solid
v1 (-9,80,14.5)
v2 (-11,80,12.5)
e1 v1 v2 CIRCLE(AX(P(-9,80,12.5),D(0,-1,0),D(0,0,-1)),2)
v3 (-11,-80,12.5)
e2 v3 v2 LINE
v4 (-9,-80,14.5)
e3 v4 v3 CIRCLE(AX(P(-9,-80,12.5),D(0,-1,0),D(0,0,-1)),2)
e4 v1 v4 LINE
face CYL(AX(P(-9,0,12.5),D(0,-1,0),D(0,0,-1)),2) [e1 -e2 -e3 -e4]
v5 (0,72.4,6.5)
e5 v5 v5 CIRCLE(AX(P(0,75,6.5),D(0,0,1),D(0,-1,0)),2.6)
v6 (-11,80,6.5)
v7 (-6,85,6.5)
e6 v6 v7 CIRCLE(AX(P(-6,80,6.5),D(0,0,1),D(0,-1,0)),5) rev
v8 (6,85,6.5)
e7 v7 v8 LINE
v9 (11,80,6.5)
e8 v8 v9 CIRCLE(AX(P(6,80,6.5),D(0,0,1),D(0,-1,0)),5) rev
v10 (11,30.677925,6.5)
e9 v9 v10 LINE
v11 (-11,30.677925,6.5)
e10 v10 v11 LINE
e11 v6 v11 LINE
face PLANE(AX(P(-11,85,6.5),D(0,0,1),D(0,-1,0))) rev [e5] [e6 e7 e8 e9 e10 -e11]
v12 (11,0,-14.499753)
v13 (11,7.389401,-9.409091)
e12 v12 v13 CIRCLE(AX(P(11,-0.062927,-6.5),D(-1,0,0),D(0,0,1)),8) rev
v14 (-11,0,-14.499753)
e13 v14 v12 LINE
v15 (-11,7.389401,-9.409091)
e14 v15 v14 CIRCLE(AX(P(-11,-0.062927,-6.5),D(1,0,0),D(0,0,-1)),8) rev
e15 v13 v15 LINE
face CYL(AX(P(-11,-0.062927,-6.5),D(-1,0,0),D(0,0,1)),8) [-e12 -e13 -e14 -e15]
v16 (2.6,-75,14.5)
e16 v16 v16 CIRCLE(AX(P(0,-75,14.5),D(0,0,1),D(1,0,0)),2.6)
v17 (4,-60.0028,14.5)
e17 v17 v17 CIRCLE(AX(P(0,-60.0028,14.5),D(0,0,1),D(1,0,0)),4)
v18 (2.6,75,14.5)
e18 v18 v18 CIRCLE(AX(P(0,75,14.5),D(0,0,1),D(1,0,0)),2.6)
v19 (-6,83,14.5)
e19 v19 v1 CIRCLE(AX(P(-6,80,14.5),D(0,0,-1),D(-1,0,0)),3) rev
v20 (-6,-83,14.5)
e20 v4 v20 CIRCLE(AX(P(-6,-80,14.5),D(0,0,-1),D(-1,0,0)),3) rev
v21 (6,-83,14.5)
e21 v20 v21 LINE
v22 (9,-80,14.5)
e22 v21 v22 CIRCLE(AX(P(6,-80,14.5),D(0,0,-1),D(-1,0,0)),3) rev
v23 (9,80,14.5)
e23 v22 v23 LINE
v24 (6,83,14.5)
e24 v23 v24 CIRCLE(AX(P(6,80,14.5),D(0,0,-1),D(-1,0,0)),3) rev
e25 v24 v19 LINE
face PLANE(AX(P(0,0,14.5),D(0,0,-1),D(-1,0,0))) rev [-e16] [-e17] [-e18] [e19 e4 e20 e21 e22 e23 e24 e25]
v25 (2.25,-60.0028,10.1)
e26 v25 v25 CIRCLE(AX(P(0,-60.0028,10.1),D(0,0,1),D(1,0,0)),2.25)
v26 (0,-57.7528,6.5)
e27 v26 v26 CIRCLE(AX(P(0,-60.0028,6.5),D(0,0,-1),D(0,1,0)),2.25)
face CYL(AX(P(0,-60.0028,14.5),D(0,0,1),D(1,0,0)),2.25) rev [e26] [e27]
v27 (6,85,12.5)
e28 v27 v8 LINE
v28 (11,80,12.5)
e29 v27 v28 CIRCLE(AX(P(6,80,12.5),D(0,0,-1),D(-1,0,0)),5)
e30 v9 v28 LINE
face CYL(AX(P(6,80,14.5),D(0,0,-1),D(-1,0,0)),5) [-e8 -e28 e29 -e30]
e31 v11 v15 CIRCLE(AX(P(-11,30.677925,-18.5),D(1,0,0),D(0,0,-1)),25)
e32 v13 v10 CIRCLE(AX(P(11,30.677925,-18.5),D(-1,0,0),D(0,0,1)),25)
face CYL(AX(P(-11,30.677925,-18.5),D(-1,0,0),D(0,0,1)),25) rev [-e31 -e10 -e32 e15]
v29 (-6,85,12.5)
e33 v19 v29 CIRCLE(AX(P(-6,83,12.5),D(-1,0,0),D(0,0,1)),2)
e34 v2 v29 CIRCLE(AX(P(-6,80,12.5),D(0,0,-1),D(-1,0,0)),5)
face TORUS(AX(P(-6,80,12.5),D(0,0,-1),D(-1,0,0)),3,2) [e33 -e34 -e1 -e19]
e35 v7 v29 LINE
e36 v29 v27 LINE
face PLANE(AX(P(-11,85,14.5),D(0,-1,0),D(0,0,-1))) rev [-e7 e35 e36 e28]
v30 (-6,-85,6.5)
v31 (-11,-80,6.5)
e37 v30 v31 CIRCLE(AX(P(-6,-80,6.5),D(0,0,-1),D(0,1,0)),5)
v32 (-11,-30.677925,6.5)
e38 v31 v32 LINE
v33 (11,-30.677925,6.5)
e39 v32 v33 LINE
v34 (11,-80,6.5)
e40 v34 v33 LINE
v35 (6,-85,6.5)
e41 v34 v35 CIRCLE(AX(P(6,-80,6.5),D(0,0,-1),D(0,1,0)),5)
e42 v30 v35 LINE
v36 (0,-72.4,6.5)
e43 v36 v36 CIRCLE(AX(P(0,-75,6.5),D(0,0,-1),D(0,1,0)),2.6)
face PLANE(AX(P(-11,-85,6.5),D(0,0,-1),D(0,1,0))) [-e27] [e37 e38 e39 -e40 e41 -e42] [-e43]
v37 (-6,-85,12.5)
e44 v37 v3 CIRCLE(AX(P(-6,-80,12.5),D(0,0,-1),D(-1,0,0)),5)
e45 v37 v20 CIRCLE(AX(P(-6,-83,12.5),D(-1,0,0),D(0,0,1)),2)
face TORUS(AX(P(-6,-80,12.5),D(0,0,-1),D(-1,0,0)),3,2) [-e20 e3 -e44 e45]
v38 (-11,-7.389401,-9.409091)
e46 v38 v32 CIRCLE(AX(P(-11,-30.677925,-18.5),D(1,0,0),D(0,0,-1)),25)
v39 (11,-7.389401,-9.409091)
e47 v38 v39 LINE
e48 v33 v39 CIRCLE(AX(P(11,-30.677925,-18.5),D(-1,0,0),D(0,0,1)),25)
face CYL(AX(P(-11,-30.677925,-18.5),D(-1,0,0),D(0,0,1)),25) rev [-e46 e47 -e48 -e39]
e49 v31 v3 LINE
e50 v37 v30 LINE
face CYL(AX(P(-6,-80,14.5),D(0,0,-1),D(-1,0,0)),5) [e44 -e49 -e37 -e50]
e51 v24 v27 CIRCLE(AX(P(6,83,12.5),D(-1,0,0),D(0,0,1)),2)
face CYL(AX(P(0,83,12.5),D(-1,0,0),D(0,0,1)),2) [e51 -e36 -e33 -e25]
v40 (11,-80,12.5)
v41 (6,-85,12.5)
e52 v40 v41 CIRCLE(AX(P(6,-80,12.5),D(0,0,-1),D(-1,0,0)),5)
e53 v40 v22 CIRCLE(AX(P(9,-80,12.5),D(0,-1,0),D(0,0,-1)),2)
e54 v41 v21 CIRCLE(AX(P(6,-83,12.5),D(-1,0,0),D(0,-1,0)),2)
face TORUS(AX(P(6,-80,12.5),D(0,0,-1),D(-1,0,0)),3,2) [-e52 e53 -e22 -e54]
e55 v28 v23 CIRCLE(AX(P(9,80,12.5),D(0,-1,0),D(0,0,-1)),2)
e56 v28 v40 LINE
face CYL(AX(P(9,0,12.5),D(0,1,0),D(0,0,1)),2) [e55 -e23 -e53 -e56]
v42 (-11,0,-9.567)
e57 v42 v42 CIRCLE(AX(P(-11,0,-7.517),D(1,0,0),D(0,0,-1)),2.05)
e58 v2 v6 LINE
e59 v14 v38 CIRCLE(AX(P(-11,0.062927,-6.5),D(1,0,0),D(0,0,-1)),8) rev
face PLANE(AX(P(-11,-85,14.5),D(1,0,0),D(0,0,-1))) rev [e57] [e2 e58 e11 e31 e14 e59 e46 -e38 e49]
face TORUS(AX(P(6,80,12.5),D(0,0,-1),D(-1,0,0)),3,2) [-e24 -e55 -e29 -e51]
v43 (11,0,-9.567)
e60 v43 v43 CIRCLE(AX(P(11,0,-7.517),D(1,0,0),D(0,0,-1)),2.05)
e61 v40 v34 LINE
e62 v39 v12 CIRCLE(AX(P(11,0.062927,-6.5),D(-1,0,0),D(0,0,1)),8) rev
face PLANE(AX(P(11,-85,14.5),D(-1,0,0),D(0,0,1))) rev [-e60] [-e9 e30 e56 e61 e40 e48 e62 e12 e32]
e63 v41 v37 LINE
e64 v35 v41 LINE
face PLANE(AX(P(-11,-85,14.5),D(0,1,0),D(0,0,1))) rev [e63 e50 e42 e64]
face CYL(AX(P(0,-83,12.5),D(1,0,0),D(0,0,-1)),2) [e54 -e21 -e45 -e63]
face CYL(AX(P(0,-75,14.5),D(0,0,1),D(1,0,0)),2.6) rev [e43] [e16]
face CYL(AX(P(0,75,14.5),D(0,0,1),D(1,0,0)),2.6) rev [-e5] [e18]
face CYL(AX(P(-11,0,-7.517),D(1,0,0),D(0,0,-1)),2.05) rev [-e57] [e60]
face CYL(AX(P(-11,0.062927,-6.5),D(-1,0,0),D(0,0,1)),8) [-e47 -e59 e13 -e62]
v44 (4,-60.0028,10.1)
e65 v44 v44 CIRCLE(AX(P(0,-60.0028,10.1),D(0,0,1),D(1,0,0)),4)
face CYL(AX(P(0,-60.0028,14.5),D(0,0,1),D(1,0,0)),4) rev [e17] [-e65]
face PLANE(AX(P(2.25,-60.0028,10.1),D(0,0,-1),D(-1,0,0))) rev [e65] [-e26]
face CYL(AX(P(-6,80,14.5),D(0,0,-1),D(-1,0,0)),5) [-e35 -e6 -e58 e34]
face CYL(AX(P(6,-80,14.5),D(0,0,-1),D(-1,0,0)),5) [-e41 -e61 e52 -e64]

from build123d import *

# Parameters (mm, degrees)
SKETCH1_W                                           = 22
SKETCH1_H                                           = 170
BOSS_EXTRUDE1_DEPTH                                 = 14.5
SKETCH2_W                                           = 21
SKETCH2_H                                           = 79
CUT_EXTRUDE1_DEPTH                                  = 89.990167996
FILLET3_R                                           = 25
FILLET1_R                                           = 5
FILLET2_R                                           = 2
FILLET4_R                                           = 8
TAPPED_HOLE_FOR_M5X0_8_HELICOIL1_D                  = 5.2
CBORE_FOR_M4_HEX_SOCKET_HEAD_CAP_SCREW1_D           = 4.5
CBORE_FOR_M4_HEX_SOCKET_HEAD_CAP_SCREW1_CBORE_D     = 8
CBORE_FOR_M4_HEX_SOCKET_HEAD_CAP_SCREW1_CBORE_DEPTH = 4.4
SKETCH9_R                                           = 2.05
CUT_EXTRUDE2_DEPTH                                  = 89.990167996


with BuildPart() as part:
    # Sketch1 → Boss-Extrude1 (new, symmetric)
    with BuildSketch(Plane.XY):
        Rectangle(SKETCH1_W, SKETCH1_H)
    extrude(amount=BOSS_EXTRUDE1_DEPTH, both=True)

    # Sketch2 → Cut-Extrude1 (cut, through all)
    with BuildSketch(Plane(origin=(11, 0, 0), x_dir=(0, 0, -1), z_dir=(1, 0, 0))):
        with Locations((4, 45.5)):
            Rectangle(SKETCH2_W, SKETCH2_H)
    cut_extrude1 = extrude(amount=-CUT_EXTRUDE1_DEPTH, mode=Mode.SUBTRACT)

    # Mirror1: Cut-Extrude1 across plane
    add(cut_extrude1.mirror(Plane.ZX), mode=Mode.SUBTRACT)

    # Fillet3
    # the kernel refuses this fillet: 25 mm, written as the material it adds along each edge
    with BuildSketch(Plane(origin=(11, 6, 6.5), x_dir=(0, 0, -1), z_dir=(-1, 0, 0))) as fillet3_piece_1:
        with BuildLine():
            CenterArc((25, -24.677925359), FILLET3_R, 99.206896221, 80.793103779)
            Line((0, -24.677925359), (-0.5, -24.677925359))
            Line((-0.5, -24.677925359), (-0.5, 0))
            Line((-0.5, 0), (0, 0.5))
            ThreePointArc((0, 0.5), (10.5, 0.5), (20.92, 0.493558507))
            Line((20.92, 0.493558507), (21, 0))
        make_face()
    extrude(amount=22)
    with BuildSketch(Plane(origin=(11, -6, 6.5), x_dir=(0, -1, 0), z_dir=(-1, 0, 0))) as fillet3_piece_2:
        with BuildLine():
            CenterArc((24.677925359, -25), FILLET3_R, 90, 80.793103779)
            Line((0, -21), (-0.493558507, -20.92))
            ThreePointArc((-0.493558507, -20.92), (-0.5, -10.5), (-0.5, 0))
            Line((-0.5, 0), (0, 0.5))
            Line((0, 0.5), (24.677925359, 0.5))
            Line((24.677925359, 0.5), (24.677925359, 0))
        make_face()
    extrude(amount=22)

    # Fillet1
    fillet1_edges = [part.edges().sort_by_distance(p)[0] for p in [
        (11, -85, 10.5),
        (-11, -85, 10.5),
        (-11, 85, 10.5),
        (11, 85, 10.5),
    ]]
    fillet(fillet1_edges, radius=FILLET1_R)

    # Fillet2
    fillet2_edges = [part.edges().sort_by_distance(p)[0] for p in [
        (11, 0, 14.5),
        (0, -85, 14.5),
        (0, 85, 14.5),
        (-11, 0, 14.5),
        (9.535533906, 83.535533906, 14.5),
        (-9.535533906, 83.535533906, 14.5),
        (-9.535533906, -83.535533906, 14.5),
        (9.535533906, -83.535533906, 14.5),
    ]]
    fillet(fillet2_edges, radius=FILLET2_R)

    # Fillet4
    # the kernel refuses this fillet: 8 mm, written as the material it takes off along each edge
    with BuildSketch(Plane(origin=(26.157317348, -6, -14.5), x_dir=(0, 1, 0), z_dir=(-1, 0, 0))) as fillet4_piece_1:
        with BuildLine():
            CenterArc((6.062926939, -8), FILLET4_R, 90, 68.676313737)
            ThreePointArc((-1.38940089, -5.090909091), (-0.559998083, -2.582217249), (0, 0))
            Line((0, 0), (6.062926939, 0))
        make_face()
    extrude(amount=52.314634697, mode=Mode.SUBTRACT)
    with BuildSketch(Plane(origin=(26.157317348, 6, -14.5), x_dir=(0, 0.2632886899666048, 0.96471709103533), z_dir=(-1, 0, 0))) as fillet4_piece_2:
        with BuildLine():
            CenterArc((6.121436637, -7.95531876), FILLET4_R, 96.058395021, 68.676313736)
            Line((-1.596300091, -5.84900924), (0, 0))
            ThreePointArc((0, 0), (2.638550275, -0.139628875), (5.277100549, 0))
        make_face()
    extrude(amount=52.314634697, mode=Mode.SUBTRACT)

    # Tapped Hole for M5x0.8 Helicoil1 (through all)
    with Locations(Plane.XY.offset(14.5)):
        with Locations((0, 75)):
            tapped_hole_for_m5x0_8_helicoil1 = Hole(TAPPED_HOLE_FOR_M5X0_8_HELICOIL1_D / 2)

    # Mirror2: Tapped Hole for M5x0.8 Helicoil1 across plane
    add(tapped_hole_for_m5x0_8_helicoil1.mirror(Plane.ZX), mode=Mode.SUBTRACT)

    # CBORE for M4 Hex Socket Head Cap Screw1 (through all)
    with Locations(Plane.XY.offset(14.5)):
        with Locations((0, -60.0028)):
            CounterBoreHole(CBORE_FOR_M4_HEX_SOCKET_HEAD_CAP_SCREW1_D / 2, CBORE_FOR_M4_HEX_SOCKET_HEAD_CAP_SCREW1_CBORE_D / 2, CBORE_FOR_M4_HEX_SOCKET_HEAD_CAP_SCREW1_CBORE_DEPTH)

    # Sketch9 → Cut-Extrude2 (cut, through all)
    with BuildSketch(Plane(origin=(11, 0, 0), x_dir=(0, 0, -1), z_dir=(1, 0, 0))):
        with Locations((7.517, 0)):
            Circle(SKETCH9_R)
    extrude(amount=-CUT_EXTRUDE2_DEPTH, mode=Mode.SUBTRACT)


solid = part.part
